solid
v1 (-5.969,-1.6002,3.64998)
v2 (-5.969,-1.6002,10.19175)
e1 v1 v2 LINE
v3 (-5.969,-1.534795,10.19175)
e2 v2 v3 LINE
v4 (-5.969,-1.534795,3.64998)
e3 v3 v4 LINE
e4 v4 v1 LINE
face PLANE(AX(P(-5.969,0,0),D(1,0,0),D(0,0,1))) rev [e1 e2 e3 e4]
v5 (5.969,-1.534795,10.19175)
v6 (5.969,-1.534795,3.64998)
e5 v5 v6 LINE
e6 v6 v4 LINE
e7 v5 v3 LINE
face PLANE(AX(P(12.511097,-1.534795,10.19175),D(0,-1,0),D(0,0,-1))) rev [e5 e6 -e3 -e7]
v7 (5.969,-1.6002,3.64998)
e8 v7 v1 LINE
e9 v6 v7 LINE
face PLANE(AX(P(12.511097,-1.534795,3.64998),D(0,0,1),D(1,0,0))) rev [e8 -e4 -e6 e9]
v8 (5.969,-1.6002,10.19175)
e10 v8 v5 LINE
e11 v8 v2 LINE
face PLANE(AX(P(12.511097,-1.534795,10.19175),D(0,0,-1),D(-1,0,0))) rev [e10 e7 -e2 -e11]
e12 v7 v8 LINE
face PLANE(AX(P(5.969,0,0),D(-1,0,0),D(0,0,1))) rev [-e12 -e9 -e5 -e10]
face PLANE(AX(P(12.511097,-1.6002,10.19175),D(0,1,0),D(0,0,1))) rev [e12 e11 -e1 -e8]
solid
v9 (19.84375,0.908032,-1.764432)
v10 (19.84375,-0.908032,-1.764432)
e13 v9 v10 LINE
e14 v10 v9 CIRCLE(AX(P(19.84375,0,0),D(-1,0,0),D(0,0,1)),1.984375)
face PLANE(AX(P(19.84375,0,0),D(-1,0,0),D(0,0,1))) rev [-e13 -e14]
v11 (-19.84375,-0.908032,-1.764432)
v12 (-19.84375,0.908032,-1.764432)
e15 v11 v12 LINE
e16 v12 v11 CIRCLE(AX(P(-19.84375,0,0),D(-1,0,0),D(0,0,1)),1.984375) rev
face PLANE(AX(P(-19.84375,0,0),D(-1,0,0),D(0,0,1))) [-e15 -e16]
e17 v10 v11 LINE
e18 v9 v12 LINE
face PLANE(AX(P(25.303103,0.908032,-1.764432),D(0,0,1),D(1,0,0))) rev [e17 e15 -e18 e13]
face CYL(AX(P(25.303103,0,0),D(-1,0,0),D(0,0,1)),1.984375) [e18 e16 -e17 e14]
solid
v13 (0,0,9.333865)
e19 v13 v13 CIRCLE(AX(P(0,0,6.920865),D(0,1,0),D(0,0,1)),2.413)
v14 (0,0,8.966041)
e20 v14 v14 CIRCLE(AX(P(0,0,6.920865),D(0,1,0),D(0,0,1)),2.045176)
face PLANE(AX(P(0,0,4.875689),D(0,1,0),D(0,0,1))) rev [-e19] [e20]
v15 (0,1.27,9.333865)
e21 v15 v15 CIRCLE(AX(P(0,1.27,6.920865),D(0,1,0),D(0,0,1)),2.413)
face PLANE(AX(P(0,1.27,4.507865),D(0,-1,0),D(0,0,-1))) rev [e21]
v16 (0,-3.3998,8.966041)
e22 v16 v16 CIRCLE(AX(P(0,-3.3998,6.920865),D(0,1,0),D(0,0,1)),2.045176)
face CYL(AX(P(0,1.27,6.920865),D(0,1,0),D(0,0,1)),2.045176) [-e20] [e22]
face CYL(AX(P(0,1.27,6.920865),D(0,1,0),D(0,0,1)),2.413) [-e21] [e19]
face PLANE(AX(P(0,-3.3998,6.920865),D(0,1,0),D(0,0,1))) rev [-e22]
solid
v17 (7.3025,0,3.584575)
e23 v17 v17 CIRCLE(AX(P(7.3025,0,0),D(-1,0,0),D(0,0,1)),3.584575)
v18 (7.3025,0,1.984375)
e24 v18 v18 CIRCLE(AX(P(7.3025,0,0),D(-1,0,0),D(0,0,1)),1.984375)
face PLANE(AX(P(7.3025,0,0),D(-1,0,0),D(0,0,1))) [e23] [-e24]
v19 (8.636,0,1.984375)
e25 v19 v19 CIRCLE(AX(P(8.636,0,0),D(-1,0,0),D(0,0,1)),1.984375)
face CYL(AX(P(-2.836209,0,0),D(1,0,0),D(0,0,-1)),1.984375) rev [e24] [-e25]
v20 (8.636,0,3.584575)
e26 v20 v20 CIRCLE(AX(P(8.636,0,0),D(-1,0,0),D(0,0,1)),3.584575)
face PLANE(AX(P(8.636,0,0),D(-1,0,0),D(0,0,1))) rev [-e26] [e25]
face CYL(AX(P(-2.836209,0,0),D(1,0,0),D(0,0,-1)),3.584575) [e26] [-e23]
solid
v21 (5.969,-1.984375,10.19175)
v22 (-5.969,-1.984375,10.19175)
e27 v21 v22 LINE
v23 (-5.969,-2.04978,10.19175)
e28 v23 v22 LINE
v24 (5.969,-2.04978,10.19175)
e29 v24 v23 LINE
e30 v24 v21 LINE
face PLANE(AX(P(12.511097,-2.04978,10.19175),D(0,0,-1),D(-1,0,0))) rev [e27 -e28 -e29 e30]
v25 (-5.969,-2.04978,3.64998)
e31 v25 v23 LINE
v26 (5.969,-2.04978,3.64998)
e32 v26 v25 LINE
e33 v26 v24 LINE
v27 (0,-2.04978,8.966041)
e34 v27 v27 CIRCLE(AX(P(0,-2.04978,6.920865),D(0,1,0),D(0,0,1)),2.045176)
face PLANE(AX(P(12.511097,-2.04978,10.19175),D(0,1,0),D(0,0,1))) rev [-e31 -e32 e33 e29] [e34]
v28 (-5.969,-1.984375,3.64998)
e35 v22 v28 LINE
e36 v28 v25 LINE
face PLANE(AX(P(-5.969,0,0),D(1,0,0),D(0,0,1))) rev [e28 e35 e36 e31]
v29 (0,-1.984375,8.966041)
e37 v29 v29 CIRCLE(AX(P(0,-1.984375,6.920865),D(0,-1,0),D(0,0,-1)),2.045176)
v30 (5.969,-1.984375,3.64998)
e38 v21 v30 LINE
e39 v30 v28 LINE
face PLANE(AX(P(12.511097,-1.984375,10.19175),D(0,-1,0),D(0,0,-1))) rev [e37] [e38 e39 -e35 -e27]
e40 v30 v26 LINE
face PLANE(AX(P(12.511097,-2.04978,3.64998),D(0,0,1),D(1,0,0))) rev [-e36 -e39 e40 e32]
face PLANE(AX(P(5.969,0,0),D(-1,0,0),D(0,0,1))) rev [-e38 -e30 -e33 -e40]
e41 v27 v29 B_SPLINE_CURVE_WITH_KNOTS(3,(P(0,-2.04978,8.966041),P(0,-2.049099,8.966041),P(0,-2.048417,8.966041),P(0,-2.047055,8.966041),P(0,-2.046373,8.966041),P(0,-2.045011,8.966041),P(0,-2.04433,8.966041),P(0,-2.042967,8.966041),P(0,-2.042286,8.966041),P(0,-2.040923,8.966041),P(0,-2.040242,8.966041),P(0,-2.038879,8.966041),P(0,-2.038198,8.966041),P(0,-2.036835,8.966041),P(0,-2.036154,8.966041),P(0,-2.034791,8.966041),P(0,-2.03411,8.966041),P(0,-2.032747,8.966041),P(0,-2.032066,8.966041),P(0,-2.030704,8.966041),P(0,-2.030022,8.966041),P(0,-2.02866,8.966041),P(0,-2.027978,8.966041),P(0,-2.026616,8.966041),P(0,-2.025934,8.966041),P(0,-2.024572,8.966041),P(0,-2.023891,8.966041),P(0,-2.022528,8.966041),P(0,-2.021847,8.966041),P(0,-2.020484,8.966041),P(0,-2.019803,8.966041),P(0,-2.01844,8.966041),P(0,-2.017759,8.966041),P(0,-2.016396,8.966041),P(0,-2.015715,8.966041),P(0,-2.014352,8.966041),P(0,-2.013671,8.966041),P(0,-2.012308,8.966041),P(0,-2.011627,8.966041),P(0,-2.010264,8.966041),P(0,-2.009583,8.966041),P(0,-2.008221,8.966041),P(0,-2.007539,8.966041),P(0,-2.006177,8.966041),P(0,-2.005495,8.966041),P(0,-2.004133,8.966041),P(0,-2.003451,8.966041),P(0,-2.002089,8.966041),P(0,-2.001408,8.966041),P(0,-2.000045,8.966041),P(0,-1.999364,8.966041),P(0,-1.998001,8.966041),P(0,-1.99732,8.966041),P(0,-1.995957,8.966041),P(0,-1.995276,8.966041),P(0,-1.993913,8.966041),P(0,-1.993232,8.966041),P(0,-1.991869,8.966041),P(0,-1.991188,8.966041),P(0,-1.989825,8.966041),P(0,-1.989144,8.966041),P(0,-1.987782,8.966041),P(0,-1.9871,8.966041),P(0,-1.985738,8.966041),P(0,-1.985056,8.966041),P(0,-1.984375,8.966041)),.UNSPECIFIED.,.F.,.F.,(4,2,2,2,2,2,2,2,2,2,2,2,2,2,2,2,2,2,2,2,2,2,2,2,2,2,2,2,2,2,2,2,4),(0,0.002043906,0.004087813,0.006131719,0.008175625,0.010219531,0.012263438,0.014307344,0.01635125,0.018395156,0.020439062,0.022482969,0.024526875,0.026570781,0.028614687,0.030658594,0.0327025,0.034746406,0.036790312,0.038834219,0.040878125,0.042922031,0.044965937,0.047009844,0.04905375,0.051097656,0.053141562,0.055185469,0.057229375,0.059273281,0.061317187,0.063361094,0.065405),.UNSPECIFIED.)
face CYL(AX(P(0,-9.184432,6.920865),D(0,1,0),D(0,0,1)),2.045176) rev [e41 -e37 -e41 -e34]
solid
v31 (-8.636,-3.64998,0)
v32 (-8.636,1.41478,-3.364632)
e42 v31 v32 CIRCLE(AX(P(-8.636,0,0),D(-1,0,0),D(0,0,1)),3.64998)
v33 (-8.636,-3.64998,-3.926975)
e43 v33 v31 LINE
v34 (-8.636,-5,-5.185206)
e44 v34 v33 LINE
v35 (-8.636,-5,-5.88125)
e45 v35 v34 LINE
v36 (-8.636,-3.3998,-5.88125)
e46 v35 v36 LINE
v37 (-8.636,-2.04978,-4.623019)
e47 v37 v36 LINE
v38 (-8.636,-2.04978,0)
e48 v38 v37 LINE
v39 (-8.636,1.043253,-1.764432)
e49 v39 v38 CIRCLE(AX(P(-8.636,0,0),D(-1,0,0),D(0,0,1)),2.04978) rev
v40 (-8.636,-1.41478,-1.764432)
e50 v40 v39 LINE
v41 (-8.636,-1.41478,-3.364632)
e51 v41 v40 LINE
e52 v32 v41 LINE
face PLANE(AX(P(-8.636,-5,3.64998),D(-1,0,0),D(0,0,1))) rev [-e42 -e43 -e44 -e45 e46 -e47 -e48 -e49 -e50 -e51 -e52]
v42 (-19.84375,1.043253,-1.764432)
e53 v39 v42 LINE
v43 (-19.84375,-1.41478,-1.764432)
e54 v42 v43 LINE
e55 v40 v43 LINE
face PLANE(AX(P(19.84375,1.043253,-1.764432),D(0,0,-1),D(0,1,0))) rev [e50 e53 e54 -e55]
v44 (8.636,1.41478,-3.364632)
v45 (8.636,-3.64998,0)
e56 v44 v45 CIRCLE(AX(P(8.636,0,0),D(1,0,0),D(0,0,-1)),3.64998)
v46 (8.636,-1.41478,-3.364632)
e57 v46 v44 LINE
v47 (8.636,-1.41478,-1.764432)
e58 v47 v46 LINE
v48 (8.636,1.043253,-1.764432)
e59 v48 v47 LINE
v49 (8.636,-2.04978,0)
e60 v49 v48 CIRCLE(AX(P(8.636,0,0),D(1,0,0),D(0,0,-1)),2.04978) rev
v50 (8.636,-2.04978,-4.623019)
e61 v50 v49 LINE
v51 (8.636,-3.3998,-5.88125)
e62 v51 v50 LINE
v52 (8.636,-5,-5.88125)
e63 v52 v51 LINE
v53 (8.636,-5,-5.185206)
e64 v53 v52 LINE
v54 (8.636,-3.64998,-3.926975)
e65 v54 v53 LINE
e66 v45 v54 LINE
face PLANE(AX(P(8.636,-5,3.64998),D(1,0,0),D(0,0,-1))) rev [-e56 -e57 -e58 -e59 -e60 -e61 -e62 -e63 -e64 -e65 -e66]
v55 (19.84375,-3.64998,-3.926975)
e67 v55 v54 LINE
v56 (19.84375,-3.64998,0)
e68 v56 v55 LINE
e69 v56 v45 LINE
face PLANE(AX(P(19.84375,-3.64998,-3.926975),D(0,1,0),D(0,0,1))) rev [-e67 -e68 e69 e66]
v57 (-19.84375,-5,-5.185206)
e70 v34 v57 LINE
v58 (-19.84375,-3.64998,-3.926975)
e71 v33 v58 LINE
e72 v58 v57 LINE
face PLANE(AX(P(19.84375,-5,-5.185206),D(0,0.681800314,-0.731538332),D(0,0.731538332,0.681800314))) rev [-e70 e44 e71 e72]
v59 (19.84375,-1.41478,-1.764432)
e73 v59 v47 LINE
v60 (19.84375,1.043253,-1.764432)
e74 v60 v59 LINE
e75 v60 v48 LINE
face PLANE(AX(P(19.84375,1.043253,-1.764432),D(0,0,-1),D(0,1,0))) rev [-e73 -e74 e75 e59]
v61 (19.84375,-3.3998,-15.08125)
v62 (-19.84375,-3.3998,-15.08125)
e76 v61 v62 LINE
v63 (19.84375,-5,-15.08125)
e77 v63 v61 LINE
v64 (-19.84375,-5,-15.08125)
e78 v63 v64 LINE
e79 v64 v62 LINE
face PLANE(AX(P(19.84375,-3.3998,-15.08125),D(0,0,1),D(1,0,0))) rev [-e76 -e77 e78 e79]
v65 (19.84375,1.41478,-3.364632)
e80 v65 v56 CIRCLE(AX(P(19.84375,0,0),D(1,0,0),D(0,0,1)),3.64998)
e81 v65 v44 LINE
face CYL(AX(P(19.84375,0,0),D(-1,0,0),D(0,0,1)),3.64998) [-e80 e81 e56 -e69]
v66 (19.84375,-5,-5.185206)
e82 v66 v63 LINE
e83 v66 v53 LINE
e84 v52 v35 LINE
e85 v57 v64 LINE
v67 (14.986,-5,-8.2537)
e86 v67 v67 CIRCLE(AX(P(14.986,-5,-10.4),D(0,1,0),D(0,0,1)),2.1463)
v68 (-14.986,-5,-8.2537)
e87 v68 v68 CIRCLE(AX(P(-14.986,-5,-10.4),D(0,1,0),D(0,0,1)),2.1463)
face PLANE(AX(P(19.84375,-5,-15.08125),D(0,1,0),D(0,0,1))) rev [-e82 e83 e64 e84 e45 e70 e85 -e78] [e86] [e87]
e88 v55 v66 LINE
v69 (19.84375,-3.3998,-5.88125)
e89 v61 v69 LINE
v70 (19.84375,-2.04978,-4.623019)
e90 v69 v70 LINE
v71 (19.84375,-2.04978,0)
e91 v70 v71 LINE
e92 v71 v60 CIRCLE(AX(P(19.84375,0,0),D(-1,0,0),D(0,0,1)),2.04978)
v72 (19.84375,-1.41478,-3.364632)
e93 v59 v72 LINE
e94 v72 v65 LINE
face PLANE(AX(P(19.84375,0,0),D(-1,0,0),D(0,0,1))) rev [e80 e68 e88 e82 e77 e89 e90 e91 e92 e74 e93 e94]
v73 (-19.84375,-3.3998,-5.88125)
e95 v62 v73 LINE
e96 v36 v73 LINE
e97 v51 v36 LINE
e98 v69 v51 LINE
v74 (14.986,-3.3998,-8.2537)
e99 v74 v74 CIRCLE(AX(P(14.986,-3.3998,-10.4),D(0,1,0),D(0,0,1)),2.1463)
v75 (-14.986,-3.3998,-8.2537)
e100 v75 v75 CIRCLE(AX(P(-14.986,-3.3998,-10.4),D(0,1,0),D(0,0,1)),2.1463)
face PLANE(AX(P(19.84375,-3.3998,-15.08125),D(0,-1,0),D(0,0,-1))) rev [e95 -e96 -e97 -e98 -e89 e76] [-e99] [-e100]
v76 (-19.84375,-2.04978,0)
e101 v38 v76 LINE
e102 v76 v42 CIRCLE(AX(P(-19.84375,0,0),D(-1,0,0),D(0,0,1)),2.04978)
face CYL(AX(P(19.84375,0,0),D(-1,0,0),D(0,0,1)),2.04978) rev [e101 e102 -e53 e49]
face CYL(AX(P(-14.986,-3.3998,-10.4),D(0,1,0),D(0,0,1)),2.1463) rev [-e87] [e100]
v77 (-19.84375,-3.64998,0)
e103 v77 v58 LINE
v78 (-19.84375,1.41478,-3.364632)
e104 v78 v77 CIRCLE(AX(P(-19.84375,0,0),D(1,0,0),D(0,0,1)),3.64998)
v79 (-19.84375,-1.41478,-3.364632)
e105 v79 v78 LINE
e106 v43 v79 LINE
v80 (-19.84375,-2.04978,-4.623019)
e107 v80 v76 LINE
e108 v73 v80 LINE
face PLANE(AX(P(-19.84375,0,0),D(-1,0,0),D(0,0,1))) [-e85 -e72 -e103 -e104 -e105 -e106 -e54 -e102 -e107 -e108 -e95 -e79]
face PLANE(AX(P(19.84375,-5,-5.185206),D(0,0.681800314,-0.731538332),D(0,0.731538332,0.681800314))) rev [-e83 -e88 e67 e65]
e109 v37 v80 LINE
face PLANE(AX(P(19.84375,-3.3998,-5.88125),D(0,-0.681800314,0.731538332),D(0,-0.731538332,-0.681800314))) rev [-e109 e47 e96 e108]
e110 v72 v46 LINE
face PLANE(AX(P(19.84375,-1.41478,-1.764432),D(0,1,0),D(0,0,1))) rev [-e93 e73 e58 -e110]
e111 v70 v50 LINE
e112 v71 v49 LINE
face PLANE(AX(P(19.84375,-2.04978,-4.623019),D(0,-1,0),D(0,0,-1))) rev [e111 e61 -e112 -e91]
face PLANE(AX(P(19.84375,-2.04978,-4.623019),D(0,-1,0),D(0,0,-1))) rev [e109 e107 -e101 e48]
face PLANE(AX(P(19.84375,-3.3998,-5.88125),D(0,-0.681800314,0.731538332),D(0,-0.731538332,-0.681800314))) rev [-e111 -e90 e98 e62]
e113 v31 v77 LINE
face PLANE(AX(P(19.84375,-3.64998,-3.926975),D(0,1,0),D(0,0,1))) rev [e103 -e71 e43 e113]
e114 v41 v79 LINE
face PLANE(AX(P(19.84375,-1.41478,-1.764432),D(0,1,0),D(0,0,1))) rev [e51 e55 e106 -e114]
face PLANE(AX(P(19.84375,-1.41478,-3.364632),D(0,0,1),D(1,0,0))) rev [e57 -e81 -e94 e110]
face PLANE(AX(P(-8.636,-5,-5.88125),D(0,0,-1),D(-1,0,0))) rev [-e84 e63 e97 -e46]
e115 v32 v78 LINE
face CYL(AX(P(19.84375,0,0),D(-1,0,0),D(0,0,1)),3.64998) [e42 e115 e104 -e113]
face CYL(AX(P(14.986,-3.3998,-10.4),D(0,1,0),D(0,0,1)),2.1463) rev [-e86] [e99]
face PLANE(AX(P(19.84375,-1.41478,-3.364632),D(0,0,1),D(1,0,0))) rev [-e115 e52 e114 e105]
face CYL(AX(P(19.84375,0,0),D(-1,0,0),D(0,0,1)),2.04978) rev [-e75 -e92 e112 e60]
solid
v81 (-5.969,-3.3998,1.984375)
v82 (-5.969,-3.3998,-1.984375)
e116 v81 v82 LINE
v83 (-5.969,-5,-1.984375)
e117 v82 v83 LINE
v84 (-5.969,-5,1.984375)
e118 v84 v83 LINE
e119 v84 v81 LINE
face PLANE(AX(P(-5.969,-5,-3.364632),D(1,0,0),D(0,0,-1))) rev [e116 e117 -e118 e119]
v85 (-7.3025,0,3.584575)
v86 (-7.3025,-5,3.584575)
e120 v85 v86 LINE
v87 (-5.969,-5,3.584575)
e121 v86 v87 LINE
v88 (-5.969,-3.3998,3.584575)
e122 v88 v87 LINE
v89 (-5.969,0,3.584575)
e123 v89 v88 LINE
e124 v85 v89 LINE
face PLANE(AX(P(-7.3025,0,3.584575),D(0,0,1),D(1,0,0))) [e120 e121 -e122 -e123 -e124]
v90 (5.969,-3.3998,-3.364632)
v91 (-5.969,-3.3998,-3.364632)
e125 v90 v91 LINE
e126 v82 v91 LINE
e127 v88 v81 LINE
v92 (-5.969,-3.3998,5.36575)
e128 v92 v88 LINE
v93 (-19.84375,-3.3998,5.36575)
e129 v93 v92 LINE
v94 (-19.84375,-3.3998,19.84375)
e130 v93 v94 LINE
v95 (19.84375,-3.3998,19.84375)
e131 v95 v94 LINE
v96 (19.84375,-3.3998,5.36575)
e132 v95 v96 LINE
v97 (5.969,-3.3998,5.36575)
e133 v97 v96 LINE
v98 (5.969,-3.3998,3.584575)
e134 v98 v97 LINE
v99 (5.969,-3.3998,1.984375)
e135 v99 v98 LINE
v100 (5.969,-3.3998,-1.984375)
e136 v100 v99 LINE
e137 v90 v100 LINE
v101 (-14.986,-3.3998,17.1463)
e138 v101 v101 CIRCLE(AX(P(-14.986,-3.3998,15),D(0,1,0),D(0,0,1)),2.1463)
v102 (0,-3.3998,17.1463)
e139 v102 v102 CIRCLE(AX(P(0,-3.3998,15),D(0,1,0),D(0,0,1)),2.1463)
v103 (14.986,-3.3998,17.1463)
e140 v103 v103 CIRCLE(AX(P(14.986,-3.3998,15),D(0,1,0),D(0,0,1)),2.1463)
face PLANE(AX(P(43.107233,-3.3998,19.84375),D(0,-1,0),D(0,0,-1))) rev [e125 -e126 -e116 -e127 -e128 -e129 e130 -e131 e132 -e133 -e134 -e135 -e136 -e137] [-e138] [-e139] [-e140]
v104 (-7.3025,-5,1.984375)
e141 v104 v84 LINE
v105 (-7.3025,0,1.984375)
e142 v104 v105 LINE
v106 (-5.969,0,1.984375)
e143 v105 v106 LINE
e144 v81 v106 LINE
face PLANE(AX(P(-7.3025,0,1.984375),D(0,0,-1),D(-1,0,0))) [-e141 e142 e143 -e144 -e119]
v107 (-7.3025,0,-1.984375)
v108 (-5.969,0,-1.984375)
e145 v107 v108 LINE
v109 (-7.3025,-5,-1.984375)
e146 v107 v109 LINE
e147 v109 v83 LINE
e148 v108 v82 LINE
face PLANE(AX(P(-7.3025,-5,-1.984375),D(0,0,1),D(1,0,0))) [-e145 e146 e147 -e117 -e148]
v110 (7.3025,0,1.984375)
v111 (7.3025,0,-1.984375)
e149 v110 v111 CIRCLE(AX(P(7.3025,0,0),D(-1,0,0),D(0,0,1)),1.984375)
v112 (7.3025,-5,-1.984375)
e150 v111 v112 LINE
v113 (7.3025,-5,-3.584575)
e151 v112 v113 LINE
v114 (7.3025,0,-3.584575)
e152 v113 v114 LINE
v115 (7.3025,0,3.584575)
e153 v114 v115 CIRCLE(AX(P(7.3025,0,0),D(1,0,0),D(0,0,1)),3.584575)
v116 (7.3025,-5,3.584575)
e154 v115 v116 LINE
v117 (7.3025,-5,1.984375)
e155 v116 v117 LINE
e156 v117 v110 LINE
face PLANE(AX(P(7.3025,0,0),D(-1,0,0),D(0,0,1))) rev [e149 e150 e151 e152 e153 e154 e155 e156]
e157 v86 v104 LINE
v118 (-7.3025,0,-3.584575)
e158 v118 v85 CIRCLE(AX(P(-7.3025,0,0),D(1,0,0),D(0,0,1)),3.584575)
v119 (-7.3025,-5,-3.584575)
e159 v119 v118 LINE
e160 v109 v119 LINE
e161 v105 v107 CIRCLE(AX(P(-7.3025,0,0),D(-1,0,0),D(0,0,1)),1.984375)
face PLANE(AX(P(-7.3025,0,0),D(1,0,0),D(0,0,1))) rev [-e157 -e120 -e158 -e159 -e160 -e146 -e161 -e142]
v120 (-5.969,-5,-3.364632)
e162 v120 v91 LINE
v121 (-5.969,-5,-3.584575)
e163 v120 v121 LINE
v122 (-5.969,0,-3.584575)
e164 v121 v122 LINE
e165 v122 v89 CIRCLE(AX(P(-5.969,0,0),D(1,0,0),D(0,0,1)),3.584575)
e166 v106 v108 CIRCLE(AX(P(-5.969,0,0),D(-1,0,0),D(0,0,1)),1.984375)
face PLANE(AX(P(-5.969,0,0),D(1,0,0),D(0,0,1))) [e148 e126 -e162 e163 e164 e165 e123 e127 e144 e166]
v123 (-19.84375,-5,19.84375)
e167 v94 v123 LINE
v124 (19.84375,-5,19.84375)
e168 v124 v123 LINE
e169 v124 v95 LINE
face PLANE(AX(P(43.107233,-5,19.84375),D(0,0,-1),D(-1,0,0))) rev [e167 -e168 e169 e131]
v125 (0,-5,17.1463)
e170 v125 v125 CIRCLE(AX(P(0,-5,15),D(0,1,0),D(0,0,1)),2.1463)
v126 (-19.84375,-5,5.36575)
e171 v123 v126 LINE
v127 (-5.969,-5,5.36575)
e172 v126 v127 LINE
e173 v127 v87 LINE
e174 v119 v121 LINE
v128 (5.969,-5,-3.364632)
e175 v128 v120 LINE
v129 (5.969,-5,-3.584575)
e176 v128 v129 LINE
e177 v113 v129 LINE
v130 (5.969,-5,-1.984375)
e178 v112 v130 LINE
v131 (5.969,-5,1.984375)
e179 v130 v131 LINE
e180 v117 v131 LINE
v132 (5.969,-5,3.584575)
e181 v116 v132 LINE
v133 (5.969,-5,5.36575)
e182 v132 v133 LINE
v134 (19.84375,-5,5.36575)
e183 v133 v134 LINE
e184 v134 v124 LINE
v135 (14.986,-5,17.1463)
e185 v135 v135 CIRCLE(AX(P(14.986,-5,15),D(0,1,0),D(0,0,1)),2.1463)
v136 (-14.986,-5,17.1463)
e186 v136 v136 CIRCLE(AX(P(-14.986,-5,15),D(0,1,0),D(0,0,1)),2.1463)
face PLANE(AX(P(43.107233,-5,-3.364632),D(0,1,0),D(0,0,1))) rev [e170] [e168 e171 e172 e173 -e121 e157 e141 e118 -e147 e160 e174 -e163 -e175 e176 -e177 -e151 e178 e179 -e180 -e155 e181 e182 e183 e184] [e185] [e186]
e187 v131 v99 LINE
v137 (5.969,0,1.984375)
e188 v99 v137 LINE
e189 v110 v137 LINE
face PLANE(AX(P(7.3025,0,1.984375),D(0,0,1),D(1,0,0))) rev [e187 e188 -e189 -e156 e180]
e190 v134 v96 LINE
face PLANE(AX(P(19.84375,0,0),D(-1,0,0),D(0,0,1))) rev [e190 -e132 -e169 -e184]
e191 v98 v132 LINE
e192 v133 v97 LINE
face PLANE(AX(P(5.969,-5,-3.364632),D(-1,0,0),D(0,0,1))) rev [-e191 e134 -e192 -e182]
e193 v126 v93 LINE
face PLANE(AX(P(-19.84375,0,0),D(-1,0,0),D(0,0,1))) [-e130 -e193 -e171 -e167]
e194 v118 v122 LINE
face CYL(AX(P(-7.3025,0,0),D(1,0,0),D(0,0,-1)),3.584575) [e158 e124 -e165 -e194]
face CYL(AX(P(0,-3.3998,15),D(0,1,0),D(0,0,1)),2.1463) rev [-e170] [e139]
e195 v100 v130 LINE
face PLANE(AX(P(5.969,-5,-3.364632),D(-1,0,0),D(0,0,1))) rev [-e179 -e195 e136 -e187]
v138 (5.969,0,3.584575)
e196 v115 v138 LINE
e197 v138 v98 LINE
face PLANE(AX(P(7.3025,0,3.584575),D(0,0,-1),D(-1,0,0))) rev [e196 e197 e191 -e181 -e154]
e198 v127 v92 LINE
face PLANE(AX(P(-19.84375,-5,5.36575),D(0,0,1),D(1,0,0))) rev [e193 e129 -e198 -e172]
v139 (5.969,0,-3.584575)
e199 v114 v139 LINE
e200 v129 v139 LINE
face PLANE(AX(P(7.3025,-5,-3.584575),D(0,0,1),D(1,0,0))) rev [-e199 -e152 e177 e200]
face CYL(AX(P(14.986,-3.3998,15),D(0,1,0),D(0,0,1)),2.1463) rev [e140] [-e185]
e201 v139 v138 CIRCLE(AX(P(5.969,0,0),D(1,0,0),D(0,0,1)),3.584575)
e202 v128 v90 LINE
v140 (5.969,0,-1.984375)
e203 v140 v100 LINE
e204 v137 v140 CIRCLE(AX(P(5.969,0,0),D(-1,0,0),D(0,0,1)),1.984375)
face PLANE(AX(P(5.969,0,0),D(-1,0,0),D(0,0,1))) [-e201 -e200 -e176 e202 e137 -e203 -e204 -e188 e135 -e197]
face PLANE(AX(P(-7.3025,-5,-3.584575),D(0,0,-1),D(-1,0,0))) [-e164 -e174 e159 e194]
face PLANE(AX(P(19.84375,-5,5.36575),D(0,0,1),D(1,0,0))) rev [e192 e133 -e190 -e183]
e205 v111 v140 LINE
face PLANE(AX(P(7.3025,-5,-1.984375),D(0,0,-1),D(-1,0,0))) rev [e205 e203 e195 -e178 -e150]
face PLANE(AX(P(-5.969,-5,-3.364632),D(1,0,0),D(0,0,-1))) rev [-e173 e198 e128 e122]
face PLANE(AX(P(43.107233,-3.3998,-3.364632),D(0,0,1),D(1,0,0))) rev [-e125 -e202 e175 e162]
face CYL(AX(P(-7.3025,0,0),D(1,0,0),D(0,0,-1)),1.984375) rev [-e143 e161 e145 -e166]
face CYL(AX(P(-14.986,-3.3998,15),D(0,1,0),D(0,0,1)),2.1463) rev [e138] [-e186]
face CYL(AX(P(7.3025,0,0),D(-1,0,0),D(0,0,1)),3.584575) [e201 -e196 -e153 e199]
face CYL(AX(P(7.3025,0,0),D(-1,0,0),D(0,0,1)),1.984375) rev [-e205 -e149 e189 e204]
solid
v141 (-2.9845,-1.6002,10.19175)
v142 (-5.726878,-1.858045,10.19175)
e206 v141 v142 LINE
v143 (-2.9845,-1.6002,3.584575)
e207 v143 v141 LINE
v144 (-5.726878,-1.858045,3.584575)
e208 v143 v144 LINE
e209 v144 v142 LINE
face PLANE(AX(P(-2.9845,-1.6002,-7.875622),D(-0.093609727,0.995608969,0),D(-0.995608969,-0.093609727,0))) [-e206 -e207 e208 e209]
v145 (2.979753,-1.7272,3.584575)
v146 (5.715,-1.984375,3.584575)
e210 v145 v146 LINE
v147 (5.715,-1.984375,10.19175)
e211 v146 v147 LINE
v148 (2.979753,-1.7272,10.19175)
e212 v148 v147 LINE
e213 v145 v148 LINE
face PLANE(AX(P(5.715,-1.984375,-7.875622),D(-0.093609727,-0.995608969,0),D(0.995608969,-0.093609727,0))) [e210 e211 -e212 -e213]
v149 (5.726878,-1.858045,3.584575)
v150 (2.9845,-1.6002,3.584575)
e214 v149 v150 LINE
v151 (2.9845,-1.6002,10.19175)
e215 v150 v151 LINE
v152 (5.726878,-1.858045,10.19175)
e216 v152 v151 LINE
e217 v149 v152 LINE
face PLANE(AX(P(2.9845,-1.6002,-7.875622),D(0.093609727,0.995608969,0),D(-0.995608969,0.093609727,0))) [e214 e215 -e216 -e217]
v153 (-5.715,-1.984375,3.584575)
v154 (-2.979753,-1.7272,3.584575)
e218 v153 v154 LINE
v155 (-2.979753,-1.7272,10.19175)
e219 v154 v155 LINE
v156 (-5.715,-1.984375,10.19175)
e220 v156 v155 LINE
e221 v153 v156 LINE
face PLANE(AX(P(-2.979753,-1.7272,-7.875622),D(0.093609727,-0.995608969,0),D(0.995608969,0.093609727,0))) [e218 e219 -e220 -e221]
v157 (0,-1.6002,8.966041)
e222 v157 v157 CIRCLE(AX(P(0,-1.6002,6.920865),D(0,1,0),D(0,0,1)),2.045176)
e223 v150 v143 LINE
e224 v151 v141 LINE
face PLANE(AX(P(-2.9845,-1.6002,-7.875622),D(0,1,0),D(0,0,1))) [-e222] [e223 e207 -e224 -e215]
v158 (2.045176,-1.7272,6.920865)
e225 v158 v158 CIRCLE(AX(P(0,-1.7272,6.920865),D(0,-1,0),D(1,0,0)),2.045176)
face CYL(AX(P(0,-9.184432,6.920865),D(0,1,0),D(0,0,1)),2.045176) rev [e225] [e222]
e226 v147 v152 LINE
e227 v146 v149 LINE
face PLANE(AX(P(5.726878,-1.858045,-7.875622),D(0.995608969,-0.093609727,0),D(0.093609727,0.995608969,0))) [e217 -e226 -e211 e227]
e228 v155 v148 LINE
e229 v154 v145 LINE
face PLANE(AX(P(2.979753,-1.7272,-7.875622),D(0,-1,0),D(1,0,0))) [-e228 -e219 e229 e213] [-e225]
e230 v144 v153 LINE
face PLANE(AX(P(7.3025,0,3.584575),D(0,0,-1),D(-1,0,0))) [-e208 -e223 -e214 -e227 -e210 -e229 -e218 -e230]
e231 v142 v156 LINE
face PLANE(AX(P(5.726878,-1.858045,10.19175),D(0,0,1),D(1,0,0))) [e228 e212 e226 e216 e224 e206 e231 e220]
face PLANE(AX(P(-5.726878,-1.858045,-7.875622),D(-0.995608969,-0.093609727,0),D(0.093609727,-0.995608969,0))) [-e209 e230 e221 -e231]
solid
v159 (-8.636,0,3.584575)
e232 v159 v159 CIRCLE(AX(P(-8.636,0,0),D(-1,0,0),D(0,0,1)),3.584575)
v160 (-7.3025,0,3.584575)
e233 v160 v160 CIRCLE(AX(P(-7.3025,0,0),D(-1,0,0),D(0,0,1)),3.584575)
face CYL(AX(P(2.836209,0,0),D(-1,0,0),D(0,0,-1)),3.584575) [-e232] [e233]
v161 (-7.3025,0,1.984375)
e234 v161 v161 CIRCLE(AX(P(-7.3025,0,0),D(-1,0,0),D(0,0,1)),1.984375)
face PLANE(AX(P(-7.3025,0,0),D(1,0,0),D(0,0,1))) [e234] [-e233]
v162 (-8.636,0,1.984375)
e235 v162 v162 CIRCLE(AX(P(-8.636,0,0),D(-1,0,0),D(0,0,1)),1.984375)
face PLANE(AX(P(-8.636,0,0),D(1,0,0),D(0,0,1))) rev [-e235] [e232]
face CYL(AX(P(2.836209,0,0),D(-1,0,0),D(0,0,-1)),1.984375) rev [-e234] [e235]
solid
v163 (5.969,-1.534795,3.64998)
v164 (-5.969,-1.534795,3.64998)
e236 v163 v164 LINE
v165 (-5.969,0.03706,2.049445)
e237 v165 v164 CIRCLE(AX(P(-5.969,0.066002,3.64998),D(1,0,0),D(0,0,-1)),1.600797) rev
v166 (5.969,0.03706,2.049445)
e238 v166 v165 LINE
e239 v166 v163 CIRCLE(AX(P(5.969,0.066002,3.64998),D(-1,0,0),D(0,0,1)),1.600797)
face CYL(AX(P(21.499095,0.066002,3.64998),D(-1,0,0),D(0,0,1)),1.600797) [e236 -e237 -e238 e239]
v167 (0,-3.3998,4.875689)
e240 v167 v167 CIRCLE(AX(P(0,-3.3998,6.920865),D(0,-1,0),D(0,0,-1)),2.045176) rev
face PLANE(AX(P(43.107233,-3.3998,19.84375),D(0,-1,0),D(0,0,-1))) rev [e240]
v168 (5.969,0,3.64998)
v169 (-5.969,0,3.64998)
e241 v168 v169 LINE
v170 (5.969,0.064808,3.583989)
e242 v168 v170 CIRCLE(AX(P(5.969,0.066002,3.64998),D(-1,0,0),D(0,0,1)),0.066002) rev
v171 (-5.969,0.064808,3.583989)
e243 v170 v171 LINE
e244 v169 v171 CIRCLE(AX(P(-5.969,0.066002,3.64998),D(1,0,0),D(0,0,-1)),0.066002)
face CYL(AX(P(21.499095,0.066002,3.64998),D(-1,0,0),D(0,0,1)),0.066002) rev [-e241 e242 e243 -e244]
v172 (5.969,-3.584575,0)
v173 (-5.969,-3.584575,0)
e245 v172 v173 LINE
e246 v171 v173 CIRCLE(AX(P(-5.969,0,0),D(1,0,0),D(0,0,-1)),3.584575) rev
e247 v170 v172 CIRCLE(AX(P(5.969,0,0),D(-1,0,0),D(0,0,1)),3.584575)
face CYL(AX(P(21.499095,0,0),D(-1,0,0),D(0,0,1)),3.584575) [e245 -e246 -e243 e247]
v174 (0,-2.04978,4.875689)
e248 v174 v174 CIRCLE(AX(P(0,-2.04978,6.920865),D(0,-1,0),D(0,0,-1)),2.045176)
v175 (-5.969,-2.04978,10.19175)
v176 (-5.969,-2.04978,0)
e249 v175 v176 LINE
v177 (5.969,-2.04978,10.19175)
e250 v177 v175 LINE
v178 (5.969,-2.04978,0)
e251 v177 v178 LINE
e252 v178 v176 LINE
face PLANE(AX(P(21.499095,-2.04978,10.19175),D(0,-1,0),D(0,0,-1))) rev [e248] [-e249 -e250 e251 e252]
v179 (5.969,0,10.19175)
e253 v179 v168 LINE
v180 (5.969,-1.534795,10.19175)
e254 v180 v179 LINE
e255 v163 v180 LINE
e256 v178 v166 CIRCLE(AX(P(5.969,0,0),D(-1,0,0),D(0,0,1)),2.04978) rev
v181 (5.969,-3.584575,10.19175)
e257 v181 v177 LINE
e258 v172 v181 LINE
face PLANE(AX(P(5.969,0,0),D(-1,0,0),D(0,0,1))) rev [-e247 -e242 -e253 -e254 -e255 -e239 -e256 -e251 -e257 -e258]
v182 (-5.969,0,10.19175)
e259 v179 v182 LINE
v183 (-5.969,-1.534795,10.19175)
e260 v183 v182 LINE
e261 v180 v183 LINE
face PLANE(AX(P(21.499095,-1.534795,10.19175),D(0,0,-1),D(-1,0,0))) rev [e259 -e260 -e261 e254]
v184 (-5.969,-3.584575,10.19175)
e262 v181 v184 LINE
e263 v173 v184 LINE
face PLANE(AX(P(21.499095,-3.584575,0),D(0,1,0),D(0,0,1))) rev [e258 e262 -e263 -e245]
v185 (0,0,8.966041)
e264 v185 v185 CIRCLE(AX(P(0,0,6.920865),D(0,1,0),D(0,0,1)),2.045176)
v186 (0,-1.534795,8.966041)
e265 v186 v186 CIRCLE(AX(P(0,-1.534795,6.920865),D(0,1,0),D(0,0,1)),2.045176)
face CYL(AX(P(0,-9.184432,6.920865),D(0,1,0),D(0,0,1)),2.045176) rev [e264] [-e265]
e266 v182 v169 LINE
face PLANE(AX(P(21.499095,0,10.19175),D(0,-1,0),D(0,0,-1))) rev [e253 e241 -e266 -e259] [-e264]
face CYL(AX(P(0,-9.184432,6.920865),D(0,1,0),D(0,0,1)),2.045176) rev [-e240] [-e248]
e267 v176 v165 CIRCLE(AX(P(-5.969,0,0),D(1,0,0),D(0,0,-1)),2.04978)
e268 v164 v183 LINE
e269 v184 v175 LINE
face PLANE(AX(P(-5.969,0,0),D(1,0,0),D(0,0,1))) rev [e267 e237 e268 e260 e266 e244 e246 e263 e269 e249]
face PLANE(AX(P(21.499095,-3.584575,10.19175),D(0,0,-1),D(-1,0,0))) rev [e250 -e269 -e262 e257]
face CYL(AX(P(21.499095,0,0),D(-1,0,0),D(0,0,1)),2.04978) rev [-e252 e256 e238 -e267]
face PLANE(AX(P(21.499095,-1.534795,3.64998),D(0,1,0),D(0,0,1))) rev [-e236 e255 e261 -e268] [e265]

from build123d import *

# Parameters (mm, degrees)
EXTRUDE1_DEPTH                      = 19.84375
CUT_EXTRUDE1_DEPTH                  = 26.420828413
CUT_EXTRUDE1_DEPTH_BACK             = 26.420828413
SKETCH2_W                           = 17.272
SKETCH2_H                           = 9.53123
EXTRUDE2_START                      = -19.84375
EXTRUDE2_DEPTH                      = 39.6875
SKETCH16_W                          = 13.87475
SKETCH16_H                          = 8.730382454
CUT_EXTRUDE4_DEPTH                  = 29.93524198
EXTRUDE7_DEPTH                      = 1.3335
SKETCH18_R                          = 3.584575
SKETCH18_R_2                        = 1.984375
EXTRUDE8_DEPTH                      = 1.3335
EXTRUDE9_START                      = -5.969
EXTRUDE9_DEPTH                      = 11.938
EXTRUDE10_START                     = -5.969
SKETCH21_W                          = 6.54177
SKETCH21_H                          = 0.065405
EXTRUDE10_DEPTH                     = 11.938
EXTRUDE12_REACH                     = 30.505
SKETCH24_W                          = 6.54177
SKETCH24_H                          = 0.065405
EXTRUDE12_DIRECTION_2_REACH         = 30.505
EXTRUDE11_DEPTH                     = 6.607175
EXTRUDE5_START                      = -19.84375
EXTRUDE5_DEPTH                      = 39.6875
SKETCH10_W                          = 2.1463
SKETCH10_H                          = 1.6002
F_8_0_199_DIAMETER_HOLE1_AT_2_COUNT = 2
F_8_0_199_DIAMETER_HOLE1_AT_2_PITCH = 29.972
F_8_0_199_DIAMETER_HOLE1_AT_3_COUNT = 2
F_8_0_199_DIAMETER_HOLE1_AT_3_PITCH = 25.4
F_8_0_199_DIAMETER_HOLE1_AT_4_COUNT = 2
F_8_0_199_DIAMETER_HOLE1_AT_4_PITCH = 39.287158004
F_8_0_199_DIAMETER_HOLE1_AT_5_COUNT = 2
F_8_0_199_DIAMETER_HOLE1_AT_5_PITCH = 29.491357988
CUT_EXTRUDE3_START                  = -3.3998
SKETCH14_R                          = 2.04517625
CUT_EXTRUDE3_DEPTH                  = 3.3998


# Read off the part's stored shape, not the designer's step: Extrude9
with BuildPart() as part:
    # Sketch1 → Extrude1 (new, symmetric)
    with BuildSketch(Plane(origin=(0, 0, 0), x_dir=(0, 0, -1), z_dir=(1, 0, 0))):
        with BuildLine():
            Line((15.08125, -3.39980016), (5.88125, -3.39980016))
            Line((5.88125, -3.39980016), (4.623019052, -2.04978))
            Line((4.623019052, -2.04978), (0, -2.04978))
            ThreePointArc((0, -2.04978), (-1.780454512, 1.01566716), (1.764432454, 1.043252684))
            Line((1.764432454, 1.043252684), (1.764432454, -1.41478))
            Line((1.764432454, -1.41478), (3.364632454, -1.41478))
            Line((3.364632454, -1.41478), (3.364632454, 1.41478))
            ThreePointArc((3.364632454, 1.41478), (-3.040252679, 2.019707317), (0, -3.64998))
            Line((0, -3.64998), (3.926974683, -3.64998))
            Line((3.926974683, -3.64998), (5.18520563, -5.00000016))
            Line((5.18520563, -5.00000016), (15.08125, -5.00000016))
            Line((15.08125, -5.00000016), (15.08125, -3.39980016))
        make_face()
    extrude(amount=EXTRUDE1_DEPTH, both=True)

    # Sketch2 → Cut-Extrude1 (cut, two sides: drawn at the far end of the back side and taken through both)
    with BuildSketch(Plane(origin=(0, 0, 0), x_dir=(1, 0, 0), z_dir=(0, 1, 0)).offset(-CUT_EXTRUDE1_DEPTH_BACK)):
        with Locations((0, 1.115635)):
            Rectangle(SKETCH2_W, SKETCH2_H)
    extrude(amount=CUT_EXTRUDE1_DEPTH + CUT_EXTRUDE1_DEPTH_BACK, mode=Mode.SUBTRACT)

    # Sketch10 → #8 (0.199) Diameter Hole1 (revolve, cut)
    with BuildSketch(Plane(origin=(-14.986, -3.39980016, -10.4), x_dir=(0, 0, 1), z_dir=(1, 0, 0))):
        with Locations((1.07315, 0.8001)):
            Rectangle(SKETCH10_W, SKETCH10_H)
    f_8_0_199_diameter_hole1 = revolve(axis=Axis((-14.986, 2.95019984, -10.4), (0, -1, 0)), mode=Mode.SUBTRACT)

    # #8 (0.199) Diameter Hole1 at 2: #8 (0.199) Diameter Hole1 ×2
    with Locations(*[(i * F_8_0_199_DIAMETER_HOLE1_AT_2_PITCH, 0, 0) for i in range(1, F_8_0_199_DIAMETER_HOLE1_AT_2_COUNT)]):
        add(f_8_0_199_diameter_hole1, mode=Mode.SUBTRACT)


with BuildPart() as body_2:
    # Sketch3 → Extrude2 (new body)
    with BuildSketch(Plane(origin=(0, 0, 0), x_dir=(0, 0, -1), z_dir=(1, 0, 0)).offset(EXTRUDE2_START)):
        Polygon((-19.84375, -5.00000016), (-5.36575, -5.00000016), (3.364632454, -5.00000016), (3.364632454, -3.39980016), (-5.36575, -3.39980016), (-19.84375, -3.39980016), align=None)
    extrude(amount=EXTRUDE2_DEPTH)

    # Sketch16 → Cut-Extrude4 (cut, through all)
    with BuildSketch(Plane(origin=(0, -3.39980016, 0), x_dir=(-1, 0, 0), z_dir=(0, 1, 0))):
        with Locations((-12.906375, 1.000558773)):
            Rectangle(SKETCH16_W, SKETCH16_H)
        with Locations((12.906375, 1.000558773)):
            Rectangle(SKETCH16_W, SKETCH16_H)
    extrude(amount=-CUT_EXTRUDE4_DEPTH, mode=Mode.SUBTRACT)

    # Sketch17 → Extrude7 (add)
    with BuildSketch(Plane(origin=(5.969, 0, 0), x_dir=(0, 0, -1), z_dir=(1, 0, 0))):
        with BuildLine():
            Line((1.984375, -5.00000016), (1.984375, 0))
            ThreePointArc((1.984375, 0), (0, 1.984375), (-1.984375, 0))
            Line((-1.984375, 0), (-1.984375, -5.00000016))
            Line((-1.984375, -5.00000016), (-3.584575, -5.00000016))
            Line((-3.584575, -5.00000016), (-3.584575, 0))
            ThreePointArc((-3.584575, 0), (0, 3.584575), (3.584575, 0))
            Line((3.584575, 0), (3.584575, -5.00000016))
            Line((3.584575, -5.00000016), (1.984375, -5.00000016))
        make_face()
    extrude7 = extrude(amount=EXTRUDE7_DEPTH)

    # Mirror3: Extrude7 across plane
    add(extrude7.mirror(Plane(origin=(0, 0, 0), x_dir=(0, 0, 1), z_dir=(1, 0, 0))))

    # #8 (0.199) Diameter Hole1 at 3: #8 (0.199) Diameter Hole1 ×2
    with Locations(*[(0, 0, i * F_8_0_199_DIAMETER_HOLE1_AT_3_PITCH) for i in range(1, F_8_0_199_DIAMETER_HOLE1_AT_3_COUNT)]):
        add(f_8_0_199_diameter_hole1, mode=Mode.SUBTRACT)

    # #8 (0.199) Diameter Hole1 at 4: #8 (0.199) Diameter Hole1 ×2
    with Locations(*[Vector(0.7628956005739062, 0, 0.6465216954016154) * (i * F_8_0_199_DIAMETER_HOLE1_AT_4_PITCH) for i in range(1, F_8_0_199_DIAMETER_HOLE1_AT_4_COUNT)]):
        add(f_8_0_199_diameter_hole1, mode=Mode.SUBTRACT)

    # #8 (0.199) Diameter Hole1 at 5: #8 (0.199) Diameter Hole1 ×2
    with Locations(*[Vector(0.5081488619782861, 0, 0.8612692575903153) * (i * F_8_0_199_DIAMETER_HOLE1_AT_5_PITCH) for i in range(1, F_8_0_199_DIAMETER_HOLE1_AT_5_COUNT)]):
        add(f_8_0_199_diameter_hole1, mode=Mode.SUBTRACT)


with BuildPart() as body_3:
    # Sketch18 → Extrude8 (new body)
    with BuildSketch(Plane.ZY.offset(-8.636)):
        Circle(SKETCH18_R)
        Circle(SKETCH18_R_2, mode=Mode.SUBTRACT)
    extrude(amount=EXTRUDE8_DEPTH)


with BuildPart() as body_4:
    # Mirror4: mirrored copy
    add(body_3.part.mirror(Plane(origin=(0, 0, 0), x_dir=(0, 0, 1), z_dir=(1, 0, 0))))


with BuildPart() as body_5:
    # Extrude9 outline → Extrude9 (new body)
    with BuildSketch(Plane(origin=(0, 0, 0), x_dir=(0, 0, -1), z_dir=(1, 0, 0)).offset(EXTRUDE9_START)):
        with BuildLine():
            Line((-10.19175, -2.04978), (-10.19175, -3.584575))
            Line((-10.19175, -3.584575), (0, -3.584575))
            ThreePointArc((0, -3.584575), (2.557487879, 2.511659547), (-3.583989091, 0.0648084))
            ThreePointArc((-3.583989091, 0.0648084), (-3.603733571, 0.018911445), (-3.64998, 0))
            Line((-3.64998, 0), (-10.19175, 0))
            Line((-10.19175, 0), (-10.19175, -1.534795))
            Line((-10.19175, -1.534795), (-3.64998, -1.534795))
            ThreePointArc((-3.64998, -1.534795), (-2.528325046, -1.076119237), (-2.049444957, 0.037059613))
            ThreePointArc((-2.049444957, 0.037059613), (1.462457197, 1.436251021), (0, -2.04978))
            Line((0, -2.04978), (-10.19175, -2.04978))
        make_face()
    extrude(amount=EXTRUDE9_DEPTH)


with BuildPart() as body_6:
    # Sketch21 → Extrude10 (new body)
    with BuildSketch(Plane(origin=(0, 0, 0), x_dir=(0, 0, -1), z_dir=(1, 0, 0)).offset(EXTRUDE10_START)):
        with Locations((-6.920865, -2.0170775)):
            Rectangle(SKETCH21_W, SKETCH21_H)
    extrude(amount=EXTRUDE10_DEPTH)


with BuildPart() as body_7:

    # Extrude12: up to this face of the body (flat: up to its plane)
    extrude12_end = Plane(body_5.part.faces().sort_by_distance((5.969, -0.844929443, 2.968720728))[0])
    # Sketch24 → Extrude12 (new, up to the picked face)
    with BuildSketch(Plane(origin=(0, 0, 0), x_dir=(0, 0, -1), z_dir=(1, 0, 0)), mode=Mode.PRIVATE) as extrude12_sk1:
        with Locations((-6.920865, -1.5674975)):
            Rectangle(SKETCH24_W, SKETCH24_H)
    extrude12_tool1 = split(extrude(extrude12_sk1.sketch, amount=EXTRUDE12_REACH, mode=Mode.PRIVATE), bisect_by=extrude12_end, keep=Keep.BOTH, mode=Mode.PRIVATE)
    add(extrude12_tool1.solids().sort_by(Axis((0, -1.567498, 6.920865), (1, 0, 0)))[0])


    # Extrude12 direction 2: up to this face of the body (flat: up to its plane)
    extrude12_direction_2_end = Plane(body_5.part.faces().sort_by_distance((-5.969, -0.844929443, 2.968720728))[0])
    # Sketch24 → Extrude12 direction 2 (add, up to the picked face)
    with BuildSketch(Plane(origin=(0, 0, 0), x_dir=(0, 0, -1), z_dir=(1, 0, 0)), mode=Mode.PRIVATE) as extrude12_direction_2_sk1:
        with Locations((-6.920865, -1.5674975)):
            Rectangle(SKETCH24_W, SKETCH24_H)
    extrude12_direction_2_tool1 = split(extrude(extrude12_direction_2_sk1.sketch, amount=-EXTRUDE12_DIRECTION_2_REACH, mode=Mode.PRIVATE), bisect_by=extrude12_direction_2_end, keep=Keep.BOTH, mode=Mode.PRIVATE)
    add(extrude12_direction_2_tool1.solids().sort_by(Axis((0, -1.567498, 6.920865), (-1, 0, 0)))[0])


with BuildPart() as body_8:
    # Sketch22 → Extrude11 (new body)
    with BuildSketch(Plane.XY.offset(10.19175)):
        Polygon((5.715, -1.984375), (2.979752876, -1.7272), (-2.979752876, -1.7272), (-5.715, -1.984375), (-5.726877831, -1.858045448), (-2.9845, -1.6002), (2.9845, -1.6002), (5.726877831, -1.858045448), align=None)
    extrude(amount=-EXTRUDE11_DEPTH)


with BuildPart() as body_9:
    # Sketch6 → Extrude5 (new body)
    with BuildSketch(Plane(origin=(0, 0, 0), x_dir=(0, 0, -1), z_dir=(1, 0, 0)).offset(EXTRUDE5_START)):
        with BuildLine():
            Line((1.764432454, 0.908032078), (1.764432454, -0.908032078))
            ThreePointArc((1.764432454, -0.908032078), (-1.984375, 0), (1.764432454, 0.908032078))
        make_face()
    extrude(amount=EXTRUDE5_DEPTH)


with BuildPart() as cut_extrude3_tool:
    # Sketch14 → Cut-Extrude3 (new body)
    with BuildSketch(Plane(origin=(0, 0, 0), x_dir=(-1, 0, 0), z_dir=(0, 1, 0)).offset(CUT_EXTRUDE3_START)):
        with Locations(Location((0, 6.920865, 0), (0, 0, 90))):
            Circle(SKETCH14_R)
    extrude(amount=CUT_EXTRUDE3_DEPTH)


with BuildPart() as body_5_1:
    add(body_5.part)

    # Cut-Extrude3: cut by cut_extrude3_tool
    add(cut_extrude3_tool.part, mode=Mode.SUBTRACT)


with BuildPart() as body_6_1:
    add(body_6.part)

    # Cut-Extrude3: cut by cut_extrude3_tool
    add(cut_extrude3_tool.part, mode=Mode.SUBTRACT)


with BuildPart() as body_8_1:
    add(body_8.part)

    # Cut-Extrude3: cut by cut_extrude3_tool
    add(cut_extrude3_tool.part, mode=Mode.SUBTRACT)


with BuildPart() as body_10:
    # Sketch23 → Revolve2 (revolve)
    with BuildSketch(Plane(origin=(0, 0, 0), x_dir=(0, 0, -1), z_dir=(1, 0, 0)), mode=Mode.PRIVATE) as revolve2_sk:
        Polygon((-6.920865, 1.27), (-6.920865, -3.39980016), (-4.87568875, -3.39980016), (-4.87568875, 0), (-4.507865, 0), (-4.507865, 1.27), align=None)
    revolve(revolve2_sk.sketch.rotate(Axis((0, 1.27, 6.920865), (0, -1, 0)), 180), axis=Axis((0, 1.27, 6.920865), (0, -1, 0)))


solid = Compound([part.part, body_2.part, body_3.part, body_4.part, body_7.part, body_9.part, body_5_1.part, body_6_1.part, body_8_1.part, body_10.part])
